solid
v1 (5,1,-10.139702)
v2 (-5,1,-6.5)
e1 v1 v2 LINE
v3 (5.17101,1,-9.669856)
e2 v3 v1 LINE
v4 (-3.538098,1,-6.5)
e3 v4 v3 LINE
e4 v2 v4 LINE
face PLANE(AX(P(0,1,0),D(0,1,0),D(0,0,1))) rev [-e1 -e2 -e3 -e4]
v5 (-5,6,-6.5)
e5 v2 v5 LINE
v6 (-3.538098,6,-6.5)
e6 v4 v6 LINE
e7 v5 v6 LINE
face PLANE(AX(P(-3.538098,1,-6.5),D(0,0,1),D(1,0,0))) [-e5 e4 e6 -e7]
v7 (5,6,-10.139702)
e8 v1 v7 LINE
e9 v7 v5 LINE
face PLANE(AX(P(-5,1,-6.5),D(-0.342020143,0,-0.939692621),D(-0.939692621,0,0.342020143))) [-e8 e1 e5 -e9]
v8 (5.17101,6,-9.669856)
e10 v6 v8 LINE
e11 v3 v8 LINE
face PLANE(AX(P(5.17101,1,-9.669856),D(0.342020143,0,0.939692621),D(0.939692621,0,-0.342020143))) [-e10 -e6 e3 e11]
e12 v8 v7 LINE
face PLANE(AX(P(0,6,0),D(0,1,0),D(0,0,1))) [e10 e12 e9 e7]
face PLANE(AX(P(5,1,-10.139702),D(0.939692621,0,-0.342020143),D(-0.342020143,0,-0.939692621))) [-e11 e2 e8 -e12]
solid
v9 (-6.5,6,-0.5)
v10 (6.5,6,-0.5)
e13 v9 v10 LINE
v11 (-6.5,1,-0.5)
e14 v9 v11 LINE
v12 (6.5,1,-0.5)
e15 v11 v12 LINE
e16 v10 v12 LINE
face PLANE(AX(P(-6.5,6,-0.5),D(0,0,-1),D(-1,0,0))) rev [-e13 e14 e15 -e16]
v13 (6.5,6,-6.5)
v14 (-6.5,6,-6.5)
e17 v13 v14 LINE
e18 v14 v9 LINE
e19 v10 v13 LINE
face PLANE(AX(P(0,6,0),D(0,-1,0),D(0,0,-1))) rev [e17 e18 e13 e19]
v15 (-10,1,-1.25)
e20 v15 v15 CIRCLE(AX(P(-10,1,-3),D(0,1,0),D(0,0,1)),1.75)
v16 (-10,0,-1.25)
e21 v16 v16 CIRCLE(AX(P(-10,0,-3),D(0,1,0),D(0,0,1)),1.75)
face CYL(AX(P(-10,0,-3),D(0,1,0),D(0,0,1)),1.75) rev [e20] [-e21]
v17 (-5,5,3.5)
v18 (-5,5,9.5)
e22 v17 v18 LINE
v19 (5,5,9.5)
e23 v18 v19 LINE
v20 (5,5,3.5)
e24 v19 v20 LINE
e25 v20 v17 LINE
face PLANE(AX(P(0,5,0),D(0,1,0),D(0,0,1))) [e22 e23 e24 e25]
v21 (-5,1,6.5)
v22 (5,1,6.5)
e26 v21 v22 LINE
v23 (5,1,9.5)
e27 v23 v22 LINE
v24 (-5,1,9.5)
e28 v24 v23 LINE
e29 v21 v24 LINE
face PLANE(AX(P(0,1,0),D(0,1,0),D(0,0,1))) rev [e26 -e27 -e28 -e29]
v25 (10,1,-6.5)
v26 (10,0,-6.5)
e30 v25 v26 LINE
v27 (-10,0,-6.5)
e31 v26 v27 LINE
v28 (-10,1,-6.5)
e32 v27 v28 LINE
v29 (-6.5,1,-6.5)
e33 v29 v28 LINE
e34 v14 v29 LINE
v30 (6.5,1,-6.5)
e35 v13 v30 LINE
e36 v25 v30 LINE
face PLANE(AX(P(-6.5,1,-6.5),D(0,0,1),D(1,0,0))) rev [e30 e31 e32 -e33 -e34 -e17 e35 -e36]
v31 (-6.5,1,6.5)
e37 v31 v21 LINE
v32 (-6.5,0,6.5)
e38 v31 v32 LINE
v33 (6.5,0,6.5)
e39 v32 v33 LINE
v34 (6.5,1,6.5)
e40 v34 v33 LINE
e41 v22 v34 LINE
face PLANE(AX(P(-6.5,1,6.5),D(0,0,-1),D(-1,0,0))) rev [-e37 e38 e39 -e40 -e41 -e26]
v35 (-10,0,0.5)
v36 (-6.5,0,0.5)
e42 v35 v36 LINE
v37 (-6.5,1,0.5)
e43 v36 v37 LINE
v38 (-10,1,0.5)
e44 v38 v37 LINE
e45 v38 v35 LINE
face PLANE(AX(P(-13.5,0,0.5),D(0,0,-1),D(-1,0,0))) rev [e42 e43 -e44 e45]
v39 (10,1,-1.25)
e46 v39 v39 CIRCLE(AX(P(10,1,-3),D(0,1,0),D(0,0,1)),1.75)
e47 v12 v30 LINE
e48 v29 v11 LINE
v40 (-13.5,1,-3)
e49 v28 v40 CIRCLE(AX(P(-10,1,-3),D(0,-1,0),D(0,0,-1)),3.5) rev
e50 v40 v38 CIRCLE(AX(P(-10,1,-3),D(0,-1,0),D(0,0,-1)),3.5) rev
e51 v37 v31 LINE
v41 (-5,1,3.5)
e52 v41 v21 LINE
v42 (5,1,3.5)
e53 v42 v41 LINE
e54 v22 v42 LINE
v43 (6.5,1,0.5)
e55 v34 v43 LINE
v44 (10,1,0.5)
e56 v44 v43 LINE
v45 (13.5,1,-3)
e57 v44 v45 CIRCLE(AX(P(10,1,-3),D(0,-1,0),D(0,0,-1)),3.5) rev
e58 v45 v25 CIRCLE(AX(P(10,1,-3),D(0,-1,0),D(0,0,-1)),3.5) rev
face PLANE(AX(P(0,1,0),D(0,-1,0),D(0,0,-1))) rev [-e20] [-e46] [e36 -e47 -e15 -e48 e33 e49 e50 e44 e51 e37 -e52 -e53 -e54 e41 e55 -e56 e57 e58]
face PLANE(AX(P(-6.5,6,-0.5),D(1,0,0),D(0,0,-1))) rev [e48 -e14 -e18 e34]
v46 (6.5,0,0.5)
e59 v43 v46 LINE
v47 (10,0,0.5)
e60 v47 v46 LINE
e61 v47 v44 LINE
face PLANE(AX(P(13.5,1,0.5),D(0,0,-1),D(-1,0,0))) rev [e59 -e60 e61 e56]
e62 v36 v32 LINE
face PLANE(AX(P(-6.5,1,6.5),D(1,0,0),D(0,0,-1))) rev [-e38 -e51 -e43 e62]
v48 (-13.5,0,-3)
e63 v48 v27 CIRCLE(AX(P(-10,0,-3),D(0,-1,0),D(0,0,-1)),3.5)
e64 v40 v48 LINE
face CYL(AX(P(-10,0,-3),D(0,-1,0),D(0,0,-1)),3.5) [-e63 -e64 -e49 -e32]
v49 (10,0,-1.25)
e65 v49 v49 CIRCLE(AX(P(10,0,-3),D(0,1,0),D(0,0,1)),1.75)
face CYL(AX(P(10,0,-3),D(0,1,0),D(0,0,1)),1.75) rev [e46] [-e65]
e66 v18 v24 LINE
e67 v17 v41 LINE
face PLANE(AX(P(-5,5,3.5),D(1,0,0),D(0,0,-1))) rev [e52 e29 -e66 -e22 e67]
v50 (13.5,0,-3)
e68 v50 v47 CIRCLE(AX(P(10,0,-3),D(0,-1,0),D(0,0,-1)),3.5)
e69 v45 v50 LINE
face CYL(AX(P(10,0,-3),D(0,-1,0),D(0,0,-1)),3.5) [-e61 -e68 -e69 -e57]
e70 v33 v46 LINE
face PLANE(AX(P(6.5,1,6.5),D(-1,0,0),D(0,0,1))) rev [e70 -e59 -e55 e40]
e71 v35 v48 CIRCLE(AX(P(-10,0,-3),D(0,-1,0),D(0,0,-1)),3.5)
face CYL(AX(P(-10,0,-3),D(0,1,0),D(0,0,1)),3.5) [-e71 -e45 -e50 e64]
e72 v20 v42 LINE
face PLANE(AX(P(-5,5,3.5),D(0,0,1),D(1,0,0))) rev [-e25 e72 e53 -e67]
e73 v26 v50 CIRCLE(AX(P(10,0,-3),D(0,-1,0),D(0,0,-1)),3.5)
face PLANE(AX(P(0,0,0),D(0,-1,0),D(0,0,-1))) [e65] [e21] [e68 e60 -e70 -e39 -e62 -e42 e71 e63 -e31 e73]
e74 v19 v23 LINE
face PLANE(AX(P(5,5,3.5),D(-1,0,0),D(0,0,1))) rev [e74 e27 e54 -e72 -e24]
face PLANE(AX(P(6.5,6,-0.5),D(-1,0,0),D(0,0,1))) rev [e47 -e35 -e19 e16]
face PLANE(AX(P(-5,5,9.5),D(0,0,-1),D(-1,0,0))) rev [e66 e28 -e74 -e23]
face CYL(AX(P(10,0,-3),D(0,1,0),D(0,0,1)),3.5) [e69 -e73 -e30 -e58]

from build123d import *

# Parameters (mm, degrees)
SKETCH1_W           = 13
SKETCH1_H           = 13
BOSS_EXTRUDE1_DEPTH = 1
SKETCH4_W           = 7
SKETCH4_H           = 1
BOSS_EXTRUDE2_DEPTH = 7
SKETCH5_W           = 7
SKETCH5_H           = 1
BOSS_EXTRUDE3_DEPTH = 7
SKETCH6_R           = 1.75
CUT_EXTRUDE1_DEPTH  = 16.016657418
SKETCH7_W           = 10
SKETCH7_H           = 6
BOSS_EXTRUDE4_DEPTH = 4
SKETCH8_W           = 13
SKETCH8_H           = 6
BOSS_EXTRUDE5_DEPTH = 5
BOSS_EXTRUDE7_DEPTH = 5
FILLET1_R           = 3.5


with BuildPart() as part:
    # Sketch1 → Boss-Extrude1 (new body)
    with BuildSketch(Plane(origin=(0, 0, 0), x_dir=(1, 0, 0), z_dir=(0, 1, 0))):
        Rectangle(SKETCH1_W, SKETCH1_H)
    extrude(amount=BOSS_EXTRUDE1_DEPTH)

    # Sketch4 → Boss-Extrude2 (add)
    with BuildSketch(Plane.ZY.offset(6.5)):
        with Locations((-3, 0.5)):
            Rectangle(SKETCH4_W, SKETCH4_H)
    extrude(amount=BOSS_EXTRUDE2_DEPTH)

    # Sketch5 → Boss-Extrude3 (add)
    with BuildSketch(Plane(origin=(6.5, 0, 0), x_dir=(0, 0, -1), z_dir=(1, 0, 0))):
        with Locations((3, 0.5)):
            Rectangle(SKETCH5_W, SKETCH5_H)
    extrude(amount=BOSS_EXTRUDE3_DEPTH)

    # Sketch6 → Cut-Extrude1 (cut, through all)
    with BuildSketch(Plane(origin=(0, 1, 0), x_dir=(1, 0, 0), z_dir=(0, 1, 0))):
        with Locations(Location((-10, 3, 0), (0, 0, 270))):
            Circle(SKETCH6_R)
        with Locations(Location((10, 3, 0), (0, 0, 270))):
            Circle(SKETCH6_R)
    extrude(amount=-CUT_EXTRUDE1_DEPTH, mode=Mode.SUBTRACT)

    # Sketch7 → Boss-Extrude4 (add)
    with BuildSketch(Plane(origin=(0, 1, 0), x_dir=(1, 0, 0), z_dir=(0, 1, 0))):
        with Locations((0, -6.5)):
            Rectangle(SKETCH7_W, SKETCH7_H)
    extrude(amount=BOSS_EXTRUDE4_DEPTH)

    # Sketch8 → Boss-Extrude5 (add)
    with BuildSketch(Plane(origin=(0, 1, 0), x_dir=(1, 0, 0), z_dir=(0, 1, 0))):
        with Locations((0, 3.5)):
            Rectangle(SKETCH8_W, SKETCH8_H)
    extrude(amount=BOSS_EXTRUDE5_DEPTH)

    # Fillet1
    fillet1_edges = [part.edges().sort_by_distance(p)[0] for p in [
        (13.5, 0.5, -6.5),
        (13.5, 0.5, 0.5),
        (-13.5, 0.5, 0.5),
        (-13.5, 0.5, -6.5),
    ]]
    fillet(fillet1_edges, radius=FILLET1_R - 0.0001)  # a hair under: the kernel refuses the full size


with BuildPart() as body_2:
    # Sketch12 → Boss-Extrude7 (new body)
    with BuildSketch(Plane(origin=(0, 6, 0), x_dir=(1, 0, 0), z_dir=(0, 1, 0))):
        Polygon((-5, 6.5), (5, 10.139702343), (5.171010072, 9.669856032), (-3.5380978, 6.5), align=None)
    extrude(amount=-BOSS_EXTRUDE7_DEPTH)


solid = Compound([part.part, body_2.part])
